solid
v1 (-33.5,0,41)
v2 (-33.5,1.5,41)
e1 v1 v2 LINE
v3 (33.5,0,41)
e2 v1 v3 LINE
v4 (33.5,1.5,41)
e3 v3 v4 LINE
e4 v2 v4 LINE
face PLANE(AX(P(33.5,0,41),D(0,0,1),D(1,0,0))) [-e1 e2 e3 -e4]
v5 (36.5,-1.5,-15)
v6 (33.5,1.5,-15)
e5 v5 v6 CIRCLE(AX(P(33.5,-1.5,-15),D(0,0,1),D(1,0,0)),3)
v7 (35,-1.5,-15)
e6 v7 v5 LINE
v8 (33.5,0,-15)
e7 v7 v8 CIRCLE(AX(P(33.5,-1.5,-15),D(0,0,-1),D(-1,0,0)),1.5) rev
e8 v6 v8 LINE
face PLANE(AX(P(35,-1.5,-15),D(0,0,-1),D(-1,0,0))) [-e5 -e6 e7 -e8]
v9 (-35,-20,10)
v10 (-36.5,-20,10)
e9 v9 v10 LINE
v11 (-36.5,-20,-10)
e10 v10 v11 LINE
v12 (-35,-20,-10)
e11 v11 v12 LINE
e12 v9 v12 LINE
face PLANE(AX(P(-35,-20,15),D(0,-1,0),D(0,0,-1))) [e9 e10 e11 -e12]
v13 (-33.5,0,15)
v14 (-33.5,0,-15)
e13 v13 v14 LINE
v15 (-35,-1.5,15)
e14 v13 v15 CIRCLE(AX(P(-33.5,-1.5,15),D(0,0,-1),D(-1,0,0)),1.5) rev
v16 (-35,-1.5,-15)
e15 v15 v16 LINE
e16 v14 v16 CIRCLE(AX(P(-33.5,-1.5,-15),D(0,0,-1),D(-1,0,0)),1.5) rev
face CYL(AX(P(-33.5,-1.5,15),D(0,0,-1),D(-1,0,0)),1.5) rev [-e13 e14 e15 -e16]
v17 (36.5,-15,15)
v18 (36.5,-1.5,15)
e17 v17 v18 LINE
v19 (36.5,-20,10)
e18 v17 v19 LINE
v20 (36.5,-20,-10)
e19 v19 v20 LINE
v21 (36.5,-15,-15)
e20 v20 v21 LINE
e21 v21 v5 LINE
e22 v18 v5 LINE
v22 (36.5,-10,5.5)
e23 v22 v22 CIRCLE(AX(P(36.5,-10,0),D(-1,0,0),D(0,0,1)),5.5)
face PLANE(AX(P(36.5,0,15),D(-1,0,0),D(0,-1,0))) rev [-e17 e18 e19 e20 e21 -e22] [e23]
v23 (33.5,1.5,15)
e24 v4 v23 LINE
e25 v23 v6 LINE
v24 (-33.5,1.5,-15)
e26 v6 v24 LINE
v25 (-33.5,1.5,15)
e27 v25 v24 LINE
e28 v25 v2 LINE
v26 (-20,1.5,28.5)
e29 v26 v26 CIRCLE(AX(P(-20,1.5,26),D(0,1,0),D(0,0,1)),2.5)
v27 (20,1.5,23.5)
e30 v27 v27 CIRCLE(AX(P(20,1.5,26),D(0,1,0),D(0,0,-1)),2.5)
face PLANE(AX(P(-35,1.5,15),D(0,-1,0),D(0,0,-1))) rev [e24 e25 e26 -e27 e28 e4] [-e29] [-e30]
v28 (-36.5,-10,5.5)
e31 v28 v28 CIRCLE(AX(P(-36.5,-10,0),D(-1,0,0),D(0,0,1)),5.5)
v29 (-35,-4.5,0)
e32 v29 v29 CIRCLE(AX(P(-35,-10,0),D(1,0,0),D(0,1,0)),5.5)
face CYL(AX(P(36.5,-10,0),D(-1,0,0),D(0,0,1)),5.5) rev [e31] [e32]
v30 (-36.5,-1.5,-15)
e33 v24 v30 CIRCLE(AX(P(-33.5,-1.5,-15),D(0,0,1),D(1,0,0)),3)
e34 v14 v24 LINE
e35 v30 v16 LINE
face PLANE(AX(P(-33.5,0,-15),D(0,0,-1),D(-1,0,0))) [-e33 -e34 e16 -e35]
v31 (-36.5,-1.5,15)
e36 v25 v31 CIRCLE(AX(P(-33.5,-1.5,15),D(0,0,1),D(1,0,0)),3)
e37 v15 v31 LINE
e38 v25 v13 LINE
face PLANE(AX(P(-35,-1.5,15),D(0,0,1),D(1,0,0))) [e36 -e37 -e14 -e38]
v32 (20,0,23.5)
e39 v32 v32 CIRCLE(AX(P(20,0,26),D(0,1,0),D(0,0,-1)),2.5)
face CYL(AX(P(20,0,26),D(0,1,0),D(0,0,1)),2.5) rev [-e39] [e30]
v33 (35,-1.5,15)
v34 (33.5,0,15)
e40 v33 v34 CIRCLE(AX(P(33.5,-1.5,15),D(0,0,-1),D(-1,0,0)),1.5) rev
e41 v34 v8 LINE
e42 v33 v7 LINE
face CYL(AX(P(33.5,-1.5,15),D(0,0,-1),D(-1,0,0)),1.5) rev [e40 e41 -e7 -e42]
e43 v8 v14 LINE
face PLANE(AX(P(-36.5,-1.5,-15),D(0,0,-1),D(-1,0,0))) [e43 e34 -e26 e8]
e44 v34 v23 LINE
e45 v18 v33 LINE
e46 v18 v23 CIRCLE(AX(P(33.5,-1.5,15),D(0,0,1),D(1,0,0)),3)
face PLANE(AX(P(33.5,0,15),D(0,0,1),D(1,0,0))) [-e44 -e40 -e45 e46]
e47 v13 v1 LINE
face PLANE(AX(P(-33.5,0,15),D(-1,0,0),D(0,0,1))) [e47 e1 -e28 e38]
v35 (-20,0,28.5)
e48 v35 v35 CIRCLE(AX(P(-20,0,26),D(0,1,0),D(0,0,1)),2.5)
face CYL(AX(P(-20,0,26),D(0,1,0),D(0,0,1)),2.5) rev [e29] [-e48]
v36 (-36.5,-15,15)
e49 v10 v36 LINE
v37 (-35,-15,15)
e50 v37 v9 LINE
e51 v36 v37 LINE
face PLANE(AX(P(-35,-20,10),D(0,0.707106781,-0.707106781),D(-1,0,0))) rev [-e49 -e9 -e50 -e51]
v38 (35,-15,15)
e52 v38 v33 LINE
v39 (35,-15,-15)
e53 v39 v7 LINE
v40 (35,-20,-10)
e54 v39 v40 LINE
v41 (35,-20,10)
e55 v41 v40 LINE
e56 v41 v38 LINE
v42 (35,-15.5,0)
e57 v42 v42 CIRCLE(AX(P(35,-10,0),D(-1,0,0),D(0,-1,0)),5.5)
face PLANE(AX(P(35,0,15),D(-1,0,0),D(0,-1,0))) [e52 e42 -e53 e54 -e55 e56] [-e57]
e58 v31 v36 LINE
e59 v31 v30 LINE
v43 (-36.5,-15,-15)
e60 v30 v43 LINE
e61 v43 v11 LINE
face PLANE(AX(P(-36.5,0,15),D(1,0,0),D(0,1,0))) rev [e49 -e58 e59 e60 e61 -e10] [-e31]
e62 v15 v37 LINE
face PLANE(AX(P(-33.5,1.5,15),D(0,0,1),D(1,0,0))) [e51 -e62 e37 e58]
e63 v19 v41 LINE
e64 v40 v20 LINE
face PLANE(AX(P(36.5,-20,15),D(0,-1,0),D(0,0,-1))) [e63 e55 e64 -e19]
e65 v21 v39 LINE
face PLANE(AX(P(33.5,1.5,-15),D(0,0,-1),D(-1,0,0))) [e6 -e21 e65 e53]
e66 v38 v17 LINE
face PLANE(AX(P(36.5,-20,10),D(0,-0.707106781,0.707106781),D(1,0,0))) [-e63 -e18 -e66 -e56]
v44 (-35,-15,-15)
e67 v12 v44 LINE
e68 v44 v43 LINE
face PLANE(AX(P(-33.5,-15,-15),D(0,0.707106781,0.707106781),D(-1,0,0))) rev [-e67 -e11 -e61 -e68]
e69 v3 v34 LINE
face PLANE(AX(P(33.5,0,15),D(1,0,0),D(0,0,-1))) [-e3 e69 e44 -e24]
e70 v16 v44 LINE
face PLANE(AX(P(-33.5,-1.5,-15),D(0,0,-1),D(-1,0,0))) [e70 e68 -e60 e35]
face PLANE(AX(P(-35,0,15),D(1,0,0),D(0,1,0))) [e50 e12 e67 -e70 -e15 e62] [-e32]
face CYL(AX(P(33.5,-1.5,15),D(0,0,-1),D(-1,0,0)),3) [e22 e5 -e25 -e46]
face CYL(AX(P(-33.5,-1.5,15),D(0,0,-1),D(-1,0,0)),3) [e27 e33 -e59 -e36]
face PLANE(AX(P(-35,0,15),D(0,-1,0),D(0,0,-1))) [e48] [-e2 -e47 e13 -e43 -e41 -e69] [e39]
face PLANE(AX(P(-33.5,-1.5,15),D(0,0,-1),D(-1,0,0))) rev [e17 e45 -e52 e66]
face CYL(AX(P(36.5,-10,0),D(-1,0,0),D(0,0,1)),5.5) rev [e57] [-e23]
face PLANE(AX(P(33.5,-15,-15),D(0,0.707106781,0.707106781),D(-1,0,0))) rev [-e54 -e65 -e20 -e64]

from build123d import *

# Parameters (mm, degrees)
SM_BASE_FLANGE_1_DEPTH   = 15
OTHER_START              = -24.748737342
OTHER_1_OUTLINE_W        = 1.5
OTHER_1_OUTLINE_H        = 23.213203436
OTHER_1_DEPTH            = 3.535533906
OTHER_START_2            = -7.071067812
OTHER_1_2_OUTLINE_W      = 1.5
OTHER_1_2_OUTLINE_H      = 3.786796564
OTHER_1_2_DEPTH          = 7.071067812
SKETCH_6_R               = 5.5
CUT_EXTRUDE_734_DEPTH    = 78.162166896
SKETCH_8_W               = 67
SKETCH_8_H               = 26
SM_BASE_FLANGE_1_2_DEPTH = 1.5
SKETCH_7_R               = 2.5
CUT_EXTRUDE_2_DEPTH      = 10


# Read off the part's stored shape, not the designer's step: Затупленный угол1
# Sheet-metal steps are written as plain solids
with BuildPart() as part:
    # Sketch 1 → Sm Base Flange 1 (new, symmetric)
    with BuildSketch(Plane.XY):
        with BuildLine():
            Line((-35, -20), (-35, -1.5))
            ThreePointArc((-35, -1.5), (-34.560660172, -0.439339828), (-33.5, 0))
            Line((-33.5, 0), (33.5, 0))
            ThreePointArc((33.5, 0), (34.560660172, -0.439339828), (35, -1.5))
            Line((35, -1.5), (35, -20))
            Line((35, -20), (36.5, -20))
            Line((36.5, -20), (36.5, -1.5))
            ThreePointArc((36.5, -1.5), (35.621320344, 0.621320344), (33.5, 1.5))
            Line((33.5, 1.5), (-33.5, 1.5))
            ThreePointArc((-33.5, 1.5), (-35.621320344, 0.621320344), (-36.5, -1.5))
            Line((-36.5, -1.5), (-36.5, -20))
            Line((-36.5, -20), (-35, -20))
        make_face()
    extrude(amount=SM_BASE_FLANGE_1_DEPTH, both=True)

    # Other 1 outline → Other 1 (cut)
    with BuildSketch(Plane(origin=(0, 0, 0), x_dir=(1, 0, 0), z_dir=(0, 0.707106781186548, -0.707106781186547)).offset(OTHER_START)):
        with Locations((-35.75, 9.606601718)):
            Rectangle(OTHER_1_OUTLINE_W, OTHER_1_OUTLINE_H)
        with Locations((35.75, 9.606601718)):
            Rectangle(OTHER_1_OUTLINE_W, OTHER_1_OUTLINE_H)
    extrude(amount=OTHER_1_DEPTH, mode=Mode.SUBTRACT)

    # Other 1 2 outline → Other 1 2 (cut)
    with BuildSketch(Plane(origin=(0, 0, 0), x_dir=(1, 0, 0), z_dir=(0, 0.707106781186548, -0.707106781186547)).offset(OTHER_START_2)):
        with Locations((-35.75, 23.106601718)):
            Rectangle(OTHER_1_2_OUTLINE_W, OTHER_1_2_OUTLINE_H)
        with Locations((35.75, 23.106601718)):
            Rectangle(OTHER_1_2_OUTLINE_W, OTHER_1_2_OUTLINE_H)
    extrude(amount=OTHER_1_2_DEPTH, mode=Mode.SUBTRACT)

    # Эскиз6 → Cut-Extrude 734 (cut, through all)
    with BuildSketch(Plane.ZY.offset(36.5)):
        with Locations((0, -10)):
            Circle(SKETCH_6_R)
    extrude(amount=-CUT_EXTRUDE_734_DEPTH, mode=Mode.SUBTRACT)

    # Эскиз8 → Sm Base Flange 1 2 (add)
    with BuildSketch(Plane(origin=(0, 1.5, 0), x_dir=(1, 0, 0), z_dir=(0, 1, 0))):
        with Locations((0, -28)):
            Rectangle(SKETCH_8_W, SKETCH_8_H)
    extrude(amount=-SM_BASE_FLANGE_1_2_DEPTH)

    # Эскиз7 → Вырез-Вытянуть2 (cut)
    with BuildSketch(Plane(origin=(0, 1.5, 0), x_dir=(1, 0, 0), z_dir=(0, 1, 0))):
        with Locations(Location((-20, -26, 0), (0, 0, 270))):
            Circle(SKETCH_7_R)
        with Locations(Location((20, -26, 0), (0, 0, 90))):
            Circle(SKETCH_7_R)
    extrude(amount=-CUT_EXTRUDE_2_DEPTH, mode=Mode.SUBTRACT)


solid = part.part
